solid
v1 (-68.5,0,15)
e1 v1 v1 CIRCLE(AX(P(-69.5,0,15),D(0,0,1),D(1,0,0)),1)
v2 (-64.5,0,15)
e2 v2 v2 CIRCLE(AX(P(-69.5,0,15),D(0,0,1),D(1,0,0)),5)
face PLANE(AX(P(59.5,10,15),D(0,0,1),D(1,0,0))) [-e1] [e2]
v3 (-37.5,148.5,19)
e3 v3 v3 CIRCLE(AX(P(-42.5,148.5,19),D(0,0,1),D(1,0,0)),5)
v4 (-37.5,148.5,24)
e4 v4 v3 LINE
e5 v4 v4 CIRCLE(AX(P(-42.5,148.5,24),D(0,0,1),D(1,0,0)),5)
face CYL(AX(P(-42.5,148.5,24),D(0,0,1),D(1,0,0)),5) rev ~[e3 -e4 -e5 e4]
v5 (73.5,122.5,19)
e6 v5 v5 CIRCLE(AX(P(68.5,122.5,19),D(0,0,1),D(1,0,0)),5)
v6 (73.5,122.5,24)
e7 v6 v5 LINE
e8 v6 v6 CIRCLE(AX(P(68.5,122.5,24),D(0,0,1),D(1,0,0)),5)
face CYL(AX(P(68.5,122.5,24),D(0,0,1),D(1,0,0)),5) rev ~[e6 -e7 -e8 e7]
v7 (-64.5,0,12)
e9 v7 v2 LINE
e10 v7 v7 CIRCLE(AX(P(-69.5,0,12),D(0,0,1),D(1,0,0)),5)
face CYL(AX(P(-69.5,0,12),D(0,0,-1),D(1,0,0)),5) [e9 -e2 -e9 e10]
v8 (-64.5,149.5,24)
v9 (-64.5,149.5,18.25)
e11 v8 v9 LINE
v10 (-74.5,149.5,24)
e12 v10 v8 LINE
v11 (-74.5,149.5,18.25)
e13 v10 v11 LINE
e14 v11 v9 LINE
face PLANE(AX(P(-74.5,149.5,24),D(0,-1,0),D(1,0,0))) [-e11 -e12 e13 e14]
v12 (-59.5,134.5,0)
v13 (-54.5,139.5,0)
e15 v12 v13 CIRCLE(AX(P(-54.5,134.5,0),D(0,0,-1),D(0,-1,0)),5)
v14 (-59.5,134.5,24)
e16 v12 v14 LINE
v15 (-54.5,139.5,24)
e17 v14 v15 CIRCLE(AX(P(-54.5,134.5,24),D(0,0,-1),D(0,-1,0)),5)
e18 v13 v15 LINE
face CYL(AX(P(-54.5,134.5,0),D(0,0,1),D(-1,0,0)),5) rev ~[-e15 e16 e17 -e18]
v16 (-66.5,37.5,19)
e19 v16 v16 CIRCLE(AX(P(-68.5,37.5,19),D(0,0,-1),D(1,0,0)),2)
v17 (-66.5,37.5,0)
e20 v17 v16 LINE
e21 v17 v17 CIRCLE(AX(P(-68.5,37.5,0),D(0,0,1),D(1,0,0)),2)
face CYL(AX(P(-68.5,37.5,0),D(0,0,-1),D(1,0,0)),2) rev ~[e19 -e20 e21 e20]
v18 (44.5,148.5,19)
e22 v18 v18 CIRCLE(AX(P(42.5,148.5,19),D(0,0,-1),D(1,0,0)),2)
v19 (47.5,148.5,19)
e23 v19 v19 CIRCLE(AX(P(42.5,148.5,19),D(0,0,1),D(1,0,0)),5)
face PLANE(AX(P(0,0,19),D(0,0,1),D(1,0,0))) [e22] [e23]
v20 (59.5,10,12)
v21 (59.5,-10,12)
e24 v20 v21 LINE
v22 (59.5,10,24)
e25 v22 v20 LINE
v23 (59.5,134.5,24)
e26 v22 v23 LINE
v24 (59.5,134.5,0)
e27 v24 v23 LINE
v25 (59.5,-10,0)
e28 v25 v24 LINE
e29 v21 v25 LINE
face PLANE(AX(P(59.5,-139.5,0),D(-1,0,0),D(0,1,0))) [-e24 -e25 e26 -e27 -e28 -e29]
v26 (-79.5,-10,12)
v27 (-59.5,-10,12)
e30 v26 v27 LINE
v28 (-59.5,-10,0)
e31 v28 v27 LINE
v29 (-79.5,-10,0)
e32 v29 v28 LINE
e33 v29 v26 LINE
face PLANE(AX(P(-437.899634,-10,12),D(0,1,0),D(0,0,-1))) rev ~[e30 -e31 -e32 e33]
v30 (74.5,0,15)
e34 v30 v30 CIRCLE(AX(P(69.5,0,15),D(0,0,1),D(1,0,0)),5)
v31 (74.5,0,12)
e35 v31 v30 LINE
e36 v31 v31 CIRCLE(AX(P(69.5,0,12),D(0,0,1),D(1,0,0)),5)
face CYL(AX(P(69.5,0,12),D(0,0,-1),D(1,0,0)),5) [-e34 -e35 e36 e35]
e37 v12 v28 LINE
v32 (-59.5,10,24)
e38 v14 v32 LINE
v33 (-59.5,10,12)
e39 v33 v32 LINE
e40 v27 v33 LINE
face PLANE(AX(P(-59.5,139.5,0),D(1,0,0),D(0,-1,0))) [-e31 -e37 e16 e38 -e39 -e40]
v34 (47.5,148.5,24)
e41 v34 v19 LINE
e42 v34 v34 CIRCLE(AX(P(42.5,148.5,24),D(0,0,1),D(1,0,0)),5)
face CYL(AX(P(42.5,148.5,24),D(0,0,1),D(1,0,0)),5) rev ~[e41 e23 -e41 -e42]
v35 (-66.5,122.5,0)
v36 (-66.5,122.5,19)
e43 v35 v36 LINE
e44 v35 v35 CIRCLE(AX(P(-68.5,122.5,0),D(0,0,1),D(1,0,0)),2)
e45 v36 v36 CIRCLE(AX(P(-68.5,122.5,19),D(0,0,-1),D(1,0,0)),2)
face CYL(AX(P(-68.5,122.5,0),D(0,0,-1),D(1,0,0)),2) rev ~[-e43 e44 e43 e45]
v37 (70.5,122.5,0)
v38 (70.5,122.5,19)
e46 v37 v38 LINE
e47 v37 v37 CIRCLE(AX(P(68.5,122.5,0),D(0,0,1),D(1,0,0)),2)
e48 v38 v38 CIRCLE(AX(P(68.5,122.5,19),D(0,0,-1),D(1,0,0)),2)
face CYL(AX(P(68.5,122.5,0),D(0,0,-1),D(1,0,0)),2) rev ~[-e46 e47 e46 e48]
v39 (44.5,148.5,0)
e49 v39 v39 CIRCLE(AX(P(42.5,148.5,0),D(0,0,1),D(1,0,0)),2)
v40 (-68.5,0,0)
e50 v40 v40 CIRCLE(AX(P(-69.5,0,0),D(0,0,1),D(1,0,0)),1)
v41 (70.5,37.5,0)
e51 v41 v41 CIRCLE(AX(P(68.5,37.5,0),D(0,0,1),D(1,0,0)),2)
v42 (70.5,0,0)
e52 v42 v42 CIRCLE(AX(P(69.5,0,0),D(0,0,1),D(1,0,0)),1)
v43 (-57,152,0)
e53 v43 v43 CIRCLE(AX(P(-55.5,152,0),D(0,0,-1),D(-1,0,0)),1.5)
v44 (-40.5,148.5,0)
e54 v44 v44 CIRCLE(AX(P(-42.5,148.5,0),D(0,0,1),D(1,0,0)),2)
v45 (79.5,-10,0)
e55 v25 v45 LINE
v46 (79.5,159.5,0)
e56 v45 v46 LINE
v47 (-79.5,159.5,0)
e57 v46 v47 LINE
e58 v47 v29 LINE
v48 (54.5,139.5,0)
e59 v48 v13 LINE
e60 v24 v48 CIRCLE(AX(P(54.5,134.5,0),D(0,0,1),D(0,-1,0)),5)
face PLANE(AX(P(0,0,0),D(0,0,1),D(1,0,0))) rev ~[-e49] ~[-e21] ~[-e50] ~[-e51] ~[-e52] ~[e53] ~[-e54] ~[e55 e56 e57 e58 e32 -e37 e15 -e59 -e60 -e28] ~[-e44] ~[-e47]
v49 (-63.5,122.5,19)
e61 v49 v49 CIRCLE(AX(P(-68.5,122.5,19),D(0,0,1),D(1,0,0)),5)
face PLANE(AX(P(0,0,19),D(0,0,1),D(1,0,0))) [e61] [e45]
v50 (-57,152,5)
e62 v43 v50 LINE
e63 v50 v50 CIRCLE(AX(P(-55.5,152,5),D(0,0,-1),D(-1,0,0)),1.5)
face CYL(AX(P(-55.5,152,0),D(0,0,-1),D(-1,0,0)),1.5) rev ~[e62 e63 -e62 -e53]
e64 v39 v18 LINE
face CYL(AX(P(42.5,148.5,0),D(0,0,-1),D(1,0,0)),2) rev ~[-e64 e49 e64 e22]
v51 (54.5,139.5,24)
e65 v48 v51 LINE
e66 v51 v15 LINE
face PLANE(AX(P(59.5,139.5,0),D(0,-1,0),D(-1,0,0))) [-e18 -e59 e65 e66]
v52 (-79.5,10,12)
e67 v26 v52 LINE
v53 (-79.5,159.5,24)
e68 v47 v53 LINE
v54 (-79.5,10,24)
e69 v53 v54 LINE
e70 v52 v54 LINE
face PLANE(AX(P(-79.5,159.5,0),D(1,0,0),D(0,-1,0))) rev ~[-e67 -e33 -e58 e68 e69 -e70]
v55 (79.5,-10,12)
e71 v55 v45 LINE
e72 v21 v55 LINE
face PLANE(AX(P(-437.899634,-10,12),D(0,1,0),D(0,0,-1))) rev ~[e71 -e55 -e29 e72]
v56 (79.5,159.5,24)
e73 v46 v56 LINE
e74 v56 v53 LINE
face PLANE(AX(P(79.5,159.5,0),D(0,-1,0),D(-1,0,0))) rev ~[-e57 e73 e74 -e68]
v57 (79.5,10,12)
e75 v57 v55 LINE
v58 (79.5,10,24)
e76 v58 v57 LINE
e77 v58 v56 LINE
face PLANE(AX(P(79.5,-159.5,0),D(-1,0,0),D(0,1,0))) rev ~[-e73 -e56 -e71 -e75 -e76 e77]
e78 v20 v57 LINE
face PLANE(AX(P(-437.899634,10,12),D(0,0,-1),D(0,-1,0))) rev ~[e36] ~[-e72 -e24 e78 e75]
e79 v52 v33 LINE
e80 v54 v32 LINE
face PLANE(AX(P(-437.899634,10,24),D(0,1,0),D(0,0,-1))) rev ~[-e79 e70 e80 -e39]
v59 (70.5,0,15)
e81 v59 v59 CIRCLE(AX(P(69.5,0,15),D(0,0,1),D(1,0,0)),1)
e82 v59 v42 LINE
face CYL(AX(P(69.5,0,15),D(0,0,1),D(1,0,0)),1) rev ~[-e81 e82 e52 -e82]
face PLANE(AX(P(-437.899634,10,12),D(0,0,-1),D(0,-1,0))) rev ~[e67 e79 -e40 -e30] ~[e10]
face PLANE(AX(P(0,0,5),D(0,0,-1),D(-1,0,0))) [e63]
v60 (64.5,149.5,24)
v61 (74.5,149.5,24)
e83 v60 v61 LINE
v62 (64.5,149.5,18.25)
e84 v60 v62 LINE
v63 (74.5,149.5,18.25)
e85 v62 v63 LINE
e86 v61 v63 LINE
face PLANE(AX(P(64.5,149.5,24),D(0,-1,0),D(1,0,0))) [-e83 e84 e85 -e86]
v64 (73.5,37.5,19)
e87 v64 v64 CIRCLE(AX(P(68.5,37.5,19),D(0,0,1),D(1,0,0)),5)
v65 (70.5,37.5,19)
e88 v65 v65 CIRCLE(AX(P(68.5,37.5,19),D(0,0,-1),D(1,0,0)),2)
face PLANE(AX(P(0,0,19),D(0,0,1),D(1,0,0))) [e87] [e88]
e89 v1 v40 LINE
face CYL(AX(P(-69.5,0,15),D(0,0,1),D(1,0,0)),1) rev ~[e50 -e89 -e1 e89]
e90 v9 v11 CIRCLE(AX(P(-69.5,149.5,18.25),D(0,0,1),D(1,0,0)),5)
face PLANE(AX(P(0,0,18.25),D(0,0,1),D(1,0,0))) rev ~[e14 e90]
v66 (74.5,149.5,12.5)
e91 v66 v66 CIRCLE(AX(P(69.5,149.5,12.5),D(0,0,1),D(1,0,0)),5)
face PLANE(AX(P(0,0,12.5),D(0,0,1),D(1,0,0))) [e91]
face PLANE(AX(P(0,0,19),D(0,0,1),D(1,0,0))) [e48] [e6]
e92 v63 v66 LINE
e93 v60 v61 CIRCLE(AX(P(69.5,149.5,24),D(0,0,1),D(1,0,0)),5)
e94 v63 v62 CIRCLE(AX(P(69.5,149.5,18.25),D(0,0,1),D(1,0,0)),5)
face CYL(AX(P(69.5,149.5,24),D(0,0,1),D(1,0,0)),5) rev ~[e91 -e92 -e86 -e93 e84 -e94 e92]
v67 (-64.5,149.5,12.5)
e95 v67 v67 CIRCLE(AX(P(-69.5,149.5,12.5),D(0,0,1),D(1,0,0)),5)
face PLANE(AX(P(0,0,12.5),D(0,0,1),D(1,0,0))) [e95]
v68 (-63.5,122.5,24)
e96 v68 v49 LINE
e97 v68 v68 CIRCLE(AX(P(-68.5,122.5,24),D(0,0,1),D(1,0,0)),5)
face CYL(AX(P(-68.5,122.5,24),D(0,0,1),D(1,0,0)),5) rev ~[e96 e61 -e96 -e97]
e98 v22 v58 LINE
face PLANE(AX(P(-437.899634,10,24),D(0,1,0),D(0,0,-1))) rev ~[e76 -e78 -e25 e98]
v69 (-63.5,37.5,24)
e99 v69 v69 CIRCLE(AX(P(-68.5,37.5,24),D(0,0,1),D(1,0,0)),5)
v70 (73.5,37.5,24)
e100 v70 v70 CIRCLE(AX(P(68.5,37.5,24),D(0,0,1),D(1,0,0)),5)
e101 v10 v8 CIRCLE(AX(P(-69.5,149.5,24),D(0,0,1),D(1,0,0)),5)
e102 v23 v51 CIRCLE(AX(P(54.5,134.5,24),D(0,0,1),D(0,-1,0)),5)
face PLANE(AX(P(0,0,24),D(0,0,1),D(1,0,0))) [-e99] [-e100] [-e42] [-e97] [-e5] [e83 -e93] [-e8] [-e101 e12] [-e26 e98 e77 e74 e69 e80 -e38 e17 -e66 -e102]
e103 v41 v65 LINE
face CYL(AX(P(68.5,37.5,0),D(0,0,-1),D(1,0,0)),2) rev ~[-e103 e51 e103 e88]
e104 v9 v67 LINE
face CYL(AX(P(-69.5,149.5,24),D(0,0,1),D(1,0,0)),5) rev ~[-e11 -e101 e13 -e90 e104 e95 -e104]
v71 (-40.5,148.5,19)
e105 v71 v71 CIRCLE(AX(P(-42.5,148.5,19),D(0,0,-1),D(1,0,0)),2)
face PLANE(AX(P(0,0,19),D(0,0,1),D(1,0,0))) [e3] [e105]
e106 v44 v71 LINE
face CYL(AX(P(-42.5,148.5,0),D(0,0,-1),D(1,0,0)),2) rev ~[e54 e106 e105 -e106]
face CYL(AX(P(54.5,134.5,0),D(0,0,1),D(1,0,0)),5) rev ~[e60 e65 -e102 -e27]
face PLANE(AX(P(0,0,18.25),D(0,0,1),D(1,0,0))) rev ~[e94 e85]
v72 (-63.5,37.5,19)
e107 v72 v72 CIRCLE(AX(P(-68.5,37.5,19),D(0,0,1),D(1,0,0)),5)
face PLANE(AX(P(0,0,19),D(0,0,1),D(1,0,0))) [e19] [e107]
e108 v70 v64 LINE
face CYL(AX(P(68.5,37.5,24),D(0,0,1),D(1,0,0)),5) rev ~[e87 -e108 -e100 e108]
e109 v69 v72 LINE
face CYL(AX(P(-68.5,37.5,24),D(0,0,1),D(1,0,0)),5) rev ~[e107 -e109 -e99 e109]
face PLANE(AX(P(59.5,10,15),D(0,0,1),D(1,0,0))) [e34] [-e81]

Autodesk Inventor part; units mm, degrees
ref_plane "YZ Plane" through (0, 0, 0) normal (1, 0, 0) x (0, 1, 0)
ref_plane "XZ Plane" through (0, 0, 0) normal (0, 1, 0) x (-1, 0, 0)
ref_plane "XY Plane" through (0, 0, 0) normal (0, 0, 1) x (1, 0, 0)
sketch "Sketch1" plane through (0, 0, 0) normal (0, 0, 1) x (1, 0, 0)
  line L0 (-79.5, -159.5) -> (79.5, -159.5)
  line L1 (79.5, -159.5) -> (79.5, 159.5)
  line L2 (79.5, 159.5) -> (-79.5, 159.5)
  line L3 (-79.5, 159.5) -> (-79.5, -159.5)
  line L4 (-79.5, -159.5) -> (79.5, 159.5) construction
  line L5 (79.5, -159.5) -> (-79.5, 159.5) construction
  line L6 (-59.5, -139.5) -> (59.5, -139.5)
  line L7 (59.5, -139.5) -> (59.5, 139.5)
  line L8 (59.5, 139.5) -> (-59.5, 139.5)
  line L9 (-59.5, 139.5) -> (-59.5, -139.5)
  line L10 (-59.5, -139.5) -> (59.5, 139.5) construction
  line L11 (59.5, -139.5) -> (-59.5, 139.5) construction
  circle A0 centre (68.5, -122.5) radius 1
  circle A1 centre (42.5, -148.5) radius 1
  circle A2 centre (68.5, -37.5) radius 1
  circle A3 centre (-68.5, -37.5) radius 1
  circle A4 centre (-68.5, -122.5) radius 1
  circle A5 centre (-42.5, -148.5) radius 1
  circle A6 centre (68.5, 122.5) radius 1
  circle A7 centre (42.5, 148.5) radius 1
  circle A8 centre (68.5, 37.5) radius 1
  circle A9 centre (-68.5, 37.5) radius 1
  circle A10 centre (-68.5, 122.5) radius 1
  circle A11 centre (-42.5, 148.5) radius 1
  circle A12 centre (-42.5, 148.5) radius 2
  circle A13 centre (-68.5, 122.5) radius 2
  circle A14 centre (42.5, 148.5) radius 2
  circle A15 centre (68.5, 122.5) radius 2
  circle A16 centre (68.5, 37.5) radius 2
  circle A17 centre (-68.5, 37.5) radius 2
  circle A18 centre (-68.5, -37.5) radius 2
  circle A19 centre (-68.5, -122.5) radius 2
  circle A20 centre (-42.5, -148.5) radius 2
  circle A21 centre (42.5, -148.5) radius 2
  circle A22 centre (68.5, -122.5) radius 2
  circle A23 centre (68.5, -37.5) radius 2
  point P0 (0, 0)
  dimension "d0" = 159
  dimension "d1" = 319
  dimension "d2" = 119
  dimension "d3" = 279
  dimension "d4" = 2
  dimension "d5" = 11
  dimension "d6" = 37
  dimension "d7" = 2
  dimension "d8" = 11
  dimension "d9" = 37
  dimension "d10" = 2
  dimension "d11" = 11
  dimension "d12" = 122
  dimension "d13" = 4
  dimension "d14" = 4
  dimension "d15" = 4
  dimension "d16" = 4
  dimension "d17" = 4
  dimension "d18" = 4
  dimension "d19" = 4
  dimension "d20" = 4
  dimension "d21" = 4
  dimension "d22" = 4
  dimension "d23" = 4
  dimension "d24" = 4
extrude "Extrusion1" add sketch "Sketch1" along normal blind 24 contours L3 L2 L1 L0
sketch "Sketch2" plane through (0, 0, 24) normal (0, 0, 1) x (1, 0, 0)
  circle A0 centre (42.5, -148.5) radius 2 projected
  circle A1 centre (42.5, -148.5) radius 5
  circle A2 centre (68.5, -122.5) radius 2 projected
  circle A3 centre (68.5, -122.5) radius 5
  circle A4 centre (68.5, -37.5) radius 2 projected
  circle A5 centre (68.5, -37.5) radius 5
  circle A6 centre (-42.5, -148.5) radius 5
  circle A7 centre (-68.5, -122.5) radius 5
  circle A8 centre (-68.5, -37.5) radius 5
  circle A9 centre (-68.5, 37.5) radius 5
  circle A10 centre (-68.5, 122.5) radius 5
  circle A11 centre (-42.5, 148.5) radius 5
  circle A12 centre (42.5, 148.5) radius 5
  circle A13 centre (68.5, 122.5) radius 5
  circle A14 centre (68.5, 37.5) radius 5
  point P0 (0, 0)
  dimension "d27" = 10
  dimension "d28" = 10
  dimension "d29" = 10
extrude "Extrusion2" cut sketch "Sketch2" against normal blind 5
sketch "Sketch3" plane through (0, 0, 24) normal (0, 0, 1) x (1, 0, 0)
  circle A0 centre (-69.5, 149.5) radius 5
  line L0 (79.5, 159.5) -> (-79.5, 159.5) projected
  line L1 (-79.5, 159.5) -> (-79.5, -159.5) projected
  line L2 (0, 115.3552) -> (0, 76.8376)
  circle A1 centre (69.5, 149.5) radius 5
  point P0 (0, 0)
  dimension "d32" = 10
  dimension "d33" = 10
  dimension "d34" = 10
extrude "Extrusion3" cut sketch "Sketch3" against normal blind 11.5
sketch "Sketch4" plane through (0, 0, 24) normal (0, 0, 1) x (1, 0, 0)
  circle A0 centre (-69.5, 149.5) radius 5 projected
  line L0 (-74.5, 149.5) -> (-64.5, 149.5)
  circle A1 centre (69.5, 149.5) radius 5 projected
  line L1 (64.5, 149.5) -> (74.5, 149.5)
  point P0 (0, 0)
extrude "Extrusion4" add sketch "Sketch4" against normal blind 5.75 contours L0 A0 | L1 A1 picked at (-70.091, 152.6074) picked at (68.909, 152.6074)
sketch "Sketch5" plane through (0, 0, 0) normal (0, 0, -1) x (-1, 0, 0)
  circle A0 centre (-55.5, -152) radius 1.5
  line L0 (79.5, -159.5) -> (-79.5, -159.5) projected
  line L1 (-79.5, -159.5) -> (-79.5, 159.5) projected
  circle A1 centre (55.5, 152) radius 1.5
  line L2 (-79.5, 159.5) -> (79.5, 159.5) projected
  line L3 (79.5, 159.5) -> (79.5, -159.5) projected
  point P0 (0, 0)
  dimension "d39" = 3
  dimension "d40" = 7.5
  dimension "d41" = 24
  dimension "d42" = 3
  dimension "d43" = 7.5
  dimension "d44" = 24
extrude "Extrusion5" cut sketch "Sketch5" against normal blind 5 contours A0 | A1
sketch "Sketch6" plane through (0, 0, 24) normal (0, 0, 1) x (1, 0, 0)
  line L0 (-79.5, -159.5) -> (79.5, -159.5) projected
  line L1 (79.5, -159.5) -> (79.5, 159.5) projected
  point P0 (0, 0)
sketch "Sketch7" plane through (0, 0, 24) normal (0, 0, 1) x (1, 0, 0)
  point P0 (0, 0)
sketch "Sketch8" plane through (0, 0, 24) normal (0, 0, 1) x (1, 0, 0)
  line L0 (-16.5, -124.5) -> (-16.5, -58.5)
  line L1 (-79.5, -159.5) -> (79.5, -159.5) projected
  line L2 (79.5, -159.5) -> (79.5, 159.5) projected
  line L3 (59.5, -139.5) -> (59.5, 139.5) projected
  line L4 (-16.5, -58.5) -> (59.5, -58.5)
  line L5 (-16.5, -124.5) -> (59.5, -124.5)
  line L6 (59.5, 139.5) -> (59.5, -139.5) projected
  point P0 (0, 0)
sketch "Sketch9" plane through (0, 0, 24) normal (0, 0, 1) x (1, 0, 0)
  point P0 (0, 0)
sketch "Sketch10" plane through (0, 0, 24) normal (0, 0, 1) x (1, 0, 0)
  point P0 (0, 0)
sketch "Sketch11" plane through (0, 0, 24) normal (0, 0, 1) x (1, 0, 0)
  point P0 (0, 0)
sketch "Sketch12" plane through (0, 0, 24) normal (0, 0, 1) x (1, 0, 0)
  point P0 (0, 0)
extrude "Extrusion6" add sketch "Sketch8" against normal blind 2
fillet "Fillet1" radius 5 6 edges at (59.5, -139.5, 12) (59.5, -58.5, 23) (-59.5, -139.5, 12) (59.5, -124.5, 23) (-59.5, 139.5, 12) (59.5, 139.5, 12)
fillet "Fillet2" radius 2 2 edges at (-16.5, -58.5, 23) (-16.5, -124.5, 23)
sketch "Sketch13" plane through (0, 0, 24) normal (0, 0, 1) x (1, 0, 0)
  point P0 (0, 0)
sketch "Sketch14" plane through (0, 0, 24) normal (0, 0, 1) x (1, 0, 0)
  circle A0 centre (-11.8564, -120.5) radius 0.5
  circle A1 centre (-11.8564, -62.5) radius 0.5
  circle A2 centre (37.1436, -120.5) radius 0.5
  circle A3 centre (37.1436, -62.5) radius 0.5
  line L0 (-14.5, -124.5) -> (54.5, -124.5) projected
  point P0 (0, 0)
  dimension "d58" = 1
  dimension "d59" = 1
  dimension "d60" = 58
  dimension "d61" = 1
  dimension "d62" = 1
  dimension "d63" = 49
  dimension "d64" = 49
  dimension "d65" = 4
extrude "Extrusion7" cut sketch "Sketch14" against normal blind 20
fillet "Fillet3" radius 5 1 edges at (59.5, -91.5, 22)
sketch "Sketch15" plane through (0, 0, 22) normal (0, 0, -1) x (-1, 0, 0)
  circle A0 centre (-37.1436, -62.5) radius 0.5 projected
  circle A1 centre (-37.1436, -120.5) radius 0.5 projected
  circle A2 centre (-37.1436, -62.5) radius 0.5 projected
  circle A3 centre (-37.1436, -62.5) radius 4
  circle A4 centre (11.8564, -62.5) radius 0.5 projected
  circle A5 centre (11.8564, -62.5) radius 4
  circle A6 centre (11.8564, -120.5) radius 0.5 projected
  circle A7 centre (11.8564, -120.5) radius 4
  circle A8 centre (-37.1436, -120.5) radius 0.5 projected
  circle A9 centre (-37.1436, -120.5) radius 4
  point P0 (0, 0)
  dimension "d71" = 8
  dimension "d72" = 8
  dimension "d73" = 8
  dimension "d74" = 8
extrude "Extrusion8" add sketch "Sketch15" along normal blind 2
sketch "Sketch17" plane through (-79.5, -159.5, 0) normal (0, -1, 0) x (1, 0, 0)
  line L0 (93, 24) -> (113, 24)
  line L1 (113, 24) -> (113, 14)
  line L2 (113, 14) -> (93, 14)
  line L3 (93, 14) -> (93, 24)
  line L4 (0, 24) -> (159, 24) projected
  line L5 (0, 0) -> (0, 24) projected
  point P0 (79.5, 0)
  dimension "d83" = 20
  dimension "d84" = 10
  dimension "d85" = 93
extrude "Extrusion10" cut sketch "Sketch17" against normal blind 21
fillet "Fillet4" radius 2 4 edges at (13.5, -149.5, 14) (13.5, -149.5, 24) (33.5, -149.5, 24) (33.5, -149.5, 14)
sketch "Sketch18" plane through (0, 0, 24) normal (0, 0, 1) x (1, 0, 0)
  point P0 (0, 0)
sketch "Sketch19" plane through (79.5, -159.5, 0) normal (1, 0, 0) x (0, 0, -1)
  line L0 (-24, 169.5) -> (-12, 169.5)
  line L1 (-12, 169.5) -> (-12, 149.5)
  line L2 (-12, 149.5) -> (0, 149.5)
  line L3 (-24, 319) -> (-24, 0) projected
  point P0 (0, 159.5)
  dimension "d89" = 12
  dimension "d90" = 20
  dimension "d91" = 12
split body "Split1" sketch "Sketch19" result one side removed curves L0 L1 L2 removed pieces at (4.5717, -81.9705, 23.5)
sketch "Sketch20" plane through (59.5, 10, 12) normal (0, 0, 1) x (1, 0, 0)
  circle A0 centre (-129, -10) radius 5
  line L0 (-119, 0) -> (-119, -20) projected
  line L1 (-139, -20) -> (-119, -20) projected
  line L2 (-59.5, -10) -> (-59.5, -28.6387)
  circle A1 centre (10, -10) radius 5
  dimension "d93" = 10
  dimension "d94" = 10
  dimension "d95" = 10
extrude "Extrusion13" add sketch "Sketch20" along normal blind 3
sketch "Sketch22" plane through (-69.5, 0, 15) normal (0, 0, 1) x (1, 0, 0)
  circle A0 centre (0, 0) radius 1
  circle A1 centre (139, 0) radius 1
  point P0 (69.5, 0)
  dimension "d103" = 2
extrude "Extrusion14" cut sketch "Sketch22" against normal blind 33
properties part number "led_matrix_frame_upper"
